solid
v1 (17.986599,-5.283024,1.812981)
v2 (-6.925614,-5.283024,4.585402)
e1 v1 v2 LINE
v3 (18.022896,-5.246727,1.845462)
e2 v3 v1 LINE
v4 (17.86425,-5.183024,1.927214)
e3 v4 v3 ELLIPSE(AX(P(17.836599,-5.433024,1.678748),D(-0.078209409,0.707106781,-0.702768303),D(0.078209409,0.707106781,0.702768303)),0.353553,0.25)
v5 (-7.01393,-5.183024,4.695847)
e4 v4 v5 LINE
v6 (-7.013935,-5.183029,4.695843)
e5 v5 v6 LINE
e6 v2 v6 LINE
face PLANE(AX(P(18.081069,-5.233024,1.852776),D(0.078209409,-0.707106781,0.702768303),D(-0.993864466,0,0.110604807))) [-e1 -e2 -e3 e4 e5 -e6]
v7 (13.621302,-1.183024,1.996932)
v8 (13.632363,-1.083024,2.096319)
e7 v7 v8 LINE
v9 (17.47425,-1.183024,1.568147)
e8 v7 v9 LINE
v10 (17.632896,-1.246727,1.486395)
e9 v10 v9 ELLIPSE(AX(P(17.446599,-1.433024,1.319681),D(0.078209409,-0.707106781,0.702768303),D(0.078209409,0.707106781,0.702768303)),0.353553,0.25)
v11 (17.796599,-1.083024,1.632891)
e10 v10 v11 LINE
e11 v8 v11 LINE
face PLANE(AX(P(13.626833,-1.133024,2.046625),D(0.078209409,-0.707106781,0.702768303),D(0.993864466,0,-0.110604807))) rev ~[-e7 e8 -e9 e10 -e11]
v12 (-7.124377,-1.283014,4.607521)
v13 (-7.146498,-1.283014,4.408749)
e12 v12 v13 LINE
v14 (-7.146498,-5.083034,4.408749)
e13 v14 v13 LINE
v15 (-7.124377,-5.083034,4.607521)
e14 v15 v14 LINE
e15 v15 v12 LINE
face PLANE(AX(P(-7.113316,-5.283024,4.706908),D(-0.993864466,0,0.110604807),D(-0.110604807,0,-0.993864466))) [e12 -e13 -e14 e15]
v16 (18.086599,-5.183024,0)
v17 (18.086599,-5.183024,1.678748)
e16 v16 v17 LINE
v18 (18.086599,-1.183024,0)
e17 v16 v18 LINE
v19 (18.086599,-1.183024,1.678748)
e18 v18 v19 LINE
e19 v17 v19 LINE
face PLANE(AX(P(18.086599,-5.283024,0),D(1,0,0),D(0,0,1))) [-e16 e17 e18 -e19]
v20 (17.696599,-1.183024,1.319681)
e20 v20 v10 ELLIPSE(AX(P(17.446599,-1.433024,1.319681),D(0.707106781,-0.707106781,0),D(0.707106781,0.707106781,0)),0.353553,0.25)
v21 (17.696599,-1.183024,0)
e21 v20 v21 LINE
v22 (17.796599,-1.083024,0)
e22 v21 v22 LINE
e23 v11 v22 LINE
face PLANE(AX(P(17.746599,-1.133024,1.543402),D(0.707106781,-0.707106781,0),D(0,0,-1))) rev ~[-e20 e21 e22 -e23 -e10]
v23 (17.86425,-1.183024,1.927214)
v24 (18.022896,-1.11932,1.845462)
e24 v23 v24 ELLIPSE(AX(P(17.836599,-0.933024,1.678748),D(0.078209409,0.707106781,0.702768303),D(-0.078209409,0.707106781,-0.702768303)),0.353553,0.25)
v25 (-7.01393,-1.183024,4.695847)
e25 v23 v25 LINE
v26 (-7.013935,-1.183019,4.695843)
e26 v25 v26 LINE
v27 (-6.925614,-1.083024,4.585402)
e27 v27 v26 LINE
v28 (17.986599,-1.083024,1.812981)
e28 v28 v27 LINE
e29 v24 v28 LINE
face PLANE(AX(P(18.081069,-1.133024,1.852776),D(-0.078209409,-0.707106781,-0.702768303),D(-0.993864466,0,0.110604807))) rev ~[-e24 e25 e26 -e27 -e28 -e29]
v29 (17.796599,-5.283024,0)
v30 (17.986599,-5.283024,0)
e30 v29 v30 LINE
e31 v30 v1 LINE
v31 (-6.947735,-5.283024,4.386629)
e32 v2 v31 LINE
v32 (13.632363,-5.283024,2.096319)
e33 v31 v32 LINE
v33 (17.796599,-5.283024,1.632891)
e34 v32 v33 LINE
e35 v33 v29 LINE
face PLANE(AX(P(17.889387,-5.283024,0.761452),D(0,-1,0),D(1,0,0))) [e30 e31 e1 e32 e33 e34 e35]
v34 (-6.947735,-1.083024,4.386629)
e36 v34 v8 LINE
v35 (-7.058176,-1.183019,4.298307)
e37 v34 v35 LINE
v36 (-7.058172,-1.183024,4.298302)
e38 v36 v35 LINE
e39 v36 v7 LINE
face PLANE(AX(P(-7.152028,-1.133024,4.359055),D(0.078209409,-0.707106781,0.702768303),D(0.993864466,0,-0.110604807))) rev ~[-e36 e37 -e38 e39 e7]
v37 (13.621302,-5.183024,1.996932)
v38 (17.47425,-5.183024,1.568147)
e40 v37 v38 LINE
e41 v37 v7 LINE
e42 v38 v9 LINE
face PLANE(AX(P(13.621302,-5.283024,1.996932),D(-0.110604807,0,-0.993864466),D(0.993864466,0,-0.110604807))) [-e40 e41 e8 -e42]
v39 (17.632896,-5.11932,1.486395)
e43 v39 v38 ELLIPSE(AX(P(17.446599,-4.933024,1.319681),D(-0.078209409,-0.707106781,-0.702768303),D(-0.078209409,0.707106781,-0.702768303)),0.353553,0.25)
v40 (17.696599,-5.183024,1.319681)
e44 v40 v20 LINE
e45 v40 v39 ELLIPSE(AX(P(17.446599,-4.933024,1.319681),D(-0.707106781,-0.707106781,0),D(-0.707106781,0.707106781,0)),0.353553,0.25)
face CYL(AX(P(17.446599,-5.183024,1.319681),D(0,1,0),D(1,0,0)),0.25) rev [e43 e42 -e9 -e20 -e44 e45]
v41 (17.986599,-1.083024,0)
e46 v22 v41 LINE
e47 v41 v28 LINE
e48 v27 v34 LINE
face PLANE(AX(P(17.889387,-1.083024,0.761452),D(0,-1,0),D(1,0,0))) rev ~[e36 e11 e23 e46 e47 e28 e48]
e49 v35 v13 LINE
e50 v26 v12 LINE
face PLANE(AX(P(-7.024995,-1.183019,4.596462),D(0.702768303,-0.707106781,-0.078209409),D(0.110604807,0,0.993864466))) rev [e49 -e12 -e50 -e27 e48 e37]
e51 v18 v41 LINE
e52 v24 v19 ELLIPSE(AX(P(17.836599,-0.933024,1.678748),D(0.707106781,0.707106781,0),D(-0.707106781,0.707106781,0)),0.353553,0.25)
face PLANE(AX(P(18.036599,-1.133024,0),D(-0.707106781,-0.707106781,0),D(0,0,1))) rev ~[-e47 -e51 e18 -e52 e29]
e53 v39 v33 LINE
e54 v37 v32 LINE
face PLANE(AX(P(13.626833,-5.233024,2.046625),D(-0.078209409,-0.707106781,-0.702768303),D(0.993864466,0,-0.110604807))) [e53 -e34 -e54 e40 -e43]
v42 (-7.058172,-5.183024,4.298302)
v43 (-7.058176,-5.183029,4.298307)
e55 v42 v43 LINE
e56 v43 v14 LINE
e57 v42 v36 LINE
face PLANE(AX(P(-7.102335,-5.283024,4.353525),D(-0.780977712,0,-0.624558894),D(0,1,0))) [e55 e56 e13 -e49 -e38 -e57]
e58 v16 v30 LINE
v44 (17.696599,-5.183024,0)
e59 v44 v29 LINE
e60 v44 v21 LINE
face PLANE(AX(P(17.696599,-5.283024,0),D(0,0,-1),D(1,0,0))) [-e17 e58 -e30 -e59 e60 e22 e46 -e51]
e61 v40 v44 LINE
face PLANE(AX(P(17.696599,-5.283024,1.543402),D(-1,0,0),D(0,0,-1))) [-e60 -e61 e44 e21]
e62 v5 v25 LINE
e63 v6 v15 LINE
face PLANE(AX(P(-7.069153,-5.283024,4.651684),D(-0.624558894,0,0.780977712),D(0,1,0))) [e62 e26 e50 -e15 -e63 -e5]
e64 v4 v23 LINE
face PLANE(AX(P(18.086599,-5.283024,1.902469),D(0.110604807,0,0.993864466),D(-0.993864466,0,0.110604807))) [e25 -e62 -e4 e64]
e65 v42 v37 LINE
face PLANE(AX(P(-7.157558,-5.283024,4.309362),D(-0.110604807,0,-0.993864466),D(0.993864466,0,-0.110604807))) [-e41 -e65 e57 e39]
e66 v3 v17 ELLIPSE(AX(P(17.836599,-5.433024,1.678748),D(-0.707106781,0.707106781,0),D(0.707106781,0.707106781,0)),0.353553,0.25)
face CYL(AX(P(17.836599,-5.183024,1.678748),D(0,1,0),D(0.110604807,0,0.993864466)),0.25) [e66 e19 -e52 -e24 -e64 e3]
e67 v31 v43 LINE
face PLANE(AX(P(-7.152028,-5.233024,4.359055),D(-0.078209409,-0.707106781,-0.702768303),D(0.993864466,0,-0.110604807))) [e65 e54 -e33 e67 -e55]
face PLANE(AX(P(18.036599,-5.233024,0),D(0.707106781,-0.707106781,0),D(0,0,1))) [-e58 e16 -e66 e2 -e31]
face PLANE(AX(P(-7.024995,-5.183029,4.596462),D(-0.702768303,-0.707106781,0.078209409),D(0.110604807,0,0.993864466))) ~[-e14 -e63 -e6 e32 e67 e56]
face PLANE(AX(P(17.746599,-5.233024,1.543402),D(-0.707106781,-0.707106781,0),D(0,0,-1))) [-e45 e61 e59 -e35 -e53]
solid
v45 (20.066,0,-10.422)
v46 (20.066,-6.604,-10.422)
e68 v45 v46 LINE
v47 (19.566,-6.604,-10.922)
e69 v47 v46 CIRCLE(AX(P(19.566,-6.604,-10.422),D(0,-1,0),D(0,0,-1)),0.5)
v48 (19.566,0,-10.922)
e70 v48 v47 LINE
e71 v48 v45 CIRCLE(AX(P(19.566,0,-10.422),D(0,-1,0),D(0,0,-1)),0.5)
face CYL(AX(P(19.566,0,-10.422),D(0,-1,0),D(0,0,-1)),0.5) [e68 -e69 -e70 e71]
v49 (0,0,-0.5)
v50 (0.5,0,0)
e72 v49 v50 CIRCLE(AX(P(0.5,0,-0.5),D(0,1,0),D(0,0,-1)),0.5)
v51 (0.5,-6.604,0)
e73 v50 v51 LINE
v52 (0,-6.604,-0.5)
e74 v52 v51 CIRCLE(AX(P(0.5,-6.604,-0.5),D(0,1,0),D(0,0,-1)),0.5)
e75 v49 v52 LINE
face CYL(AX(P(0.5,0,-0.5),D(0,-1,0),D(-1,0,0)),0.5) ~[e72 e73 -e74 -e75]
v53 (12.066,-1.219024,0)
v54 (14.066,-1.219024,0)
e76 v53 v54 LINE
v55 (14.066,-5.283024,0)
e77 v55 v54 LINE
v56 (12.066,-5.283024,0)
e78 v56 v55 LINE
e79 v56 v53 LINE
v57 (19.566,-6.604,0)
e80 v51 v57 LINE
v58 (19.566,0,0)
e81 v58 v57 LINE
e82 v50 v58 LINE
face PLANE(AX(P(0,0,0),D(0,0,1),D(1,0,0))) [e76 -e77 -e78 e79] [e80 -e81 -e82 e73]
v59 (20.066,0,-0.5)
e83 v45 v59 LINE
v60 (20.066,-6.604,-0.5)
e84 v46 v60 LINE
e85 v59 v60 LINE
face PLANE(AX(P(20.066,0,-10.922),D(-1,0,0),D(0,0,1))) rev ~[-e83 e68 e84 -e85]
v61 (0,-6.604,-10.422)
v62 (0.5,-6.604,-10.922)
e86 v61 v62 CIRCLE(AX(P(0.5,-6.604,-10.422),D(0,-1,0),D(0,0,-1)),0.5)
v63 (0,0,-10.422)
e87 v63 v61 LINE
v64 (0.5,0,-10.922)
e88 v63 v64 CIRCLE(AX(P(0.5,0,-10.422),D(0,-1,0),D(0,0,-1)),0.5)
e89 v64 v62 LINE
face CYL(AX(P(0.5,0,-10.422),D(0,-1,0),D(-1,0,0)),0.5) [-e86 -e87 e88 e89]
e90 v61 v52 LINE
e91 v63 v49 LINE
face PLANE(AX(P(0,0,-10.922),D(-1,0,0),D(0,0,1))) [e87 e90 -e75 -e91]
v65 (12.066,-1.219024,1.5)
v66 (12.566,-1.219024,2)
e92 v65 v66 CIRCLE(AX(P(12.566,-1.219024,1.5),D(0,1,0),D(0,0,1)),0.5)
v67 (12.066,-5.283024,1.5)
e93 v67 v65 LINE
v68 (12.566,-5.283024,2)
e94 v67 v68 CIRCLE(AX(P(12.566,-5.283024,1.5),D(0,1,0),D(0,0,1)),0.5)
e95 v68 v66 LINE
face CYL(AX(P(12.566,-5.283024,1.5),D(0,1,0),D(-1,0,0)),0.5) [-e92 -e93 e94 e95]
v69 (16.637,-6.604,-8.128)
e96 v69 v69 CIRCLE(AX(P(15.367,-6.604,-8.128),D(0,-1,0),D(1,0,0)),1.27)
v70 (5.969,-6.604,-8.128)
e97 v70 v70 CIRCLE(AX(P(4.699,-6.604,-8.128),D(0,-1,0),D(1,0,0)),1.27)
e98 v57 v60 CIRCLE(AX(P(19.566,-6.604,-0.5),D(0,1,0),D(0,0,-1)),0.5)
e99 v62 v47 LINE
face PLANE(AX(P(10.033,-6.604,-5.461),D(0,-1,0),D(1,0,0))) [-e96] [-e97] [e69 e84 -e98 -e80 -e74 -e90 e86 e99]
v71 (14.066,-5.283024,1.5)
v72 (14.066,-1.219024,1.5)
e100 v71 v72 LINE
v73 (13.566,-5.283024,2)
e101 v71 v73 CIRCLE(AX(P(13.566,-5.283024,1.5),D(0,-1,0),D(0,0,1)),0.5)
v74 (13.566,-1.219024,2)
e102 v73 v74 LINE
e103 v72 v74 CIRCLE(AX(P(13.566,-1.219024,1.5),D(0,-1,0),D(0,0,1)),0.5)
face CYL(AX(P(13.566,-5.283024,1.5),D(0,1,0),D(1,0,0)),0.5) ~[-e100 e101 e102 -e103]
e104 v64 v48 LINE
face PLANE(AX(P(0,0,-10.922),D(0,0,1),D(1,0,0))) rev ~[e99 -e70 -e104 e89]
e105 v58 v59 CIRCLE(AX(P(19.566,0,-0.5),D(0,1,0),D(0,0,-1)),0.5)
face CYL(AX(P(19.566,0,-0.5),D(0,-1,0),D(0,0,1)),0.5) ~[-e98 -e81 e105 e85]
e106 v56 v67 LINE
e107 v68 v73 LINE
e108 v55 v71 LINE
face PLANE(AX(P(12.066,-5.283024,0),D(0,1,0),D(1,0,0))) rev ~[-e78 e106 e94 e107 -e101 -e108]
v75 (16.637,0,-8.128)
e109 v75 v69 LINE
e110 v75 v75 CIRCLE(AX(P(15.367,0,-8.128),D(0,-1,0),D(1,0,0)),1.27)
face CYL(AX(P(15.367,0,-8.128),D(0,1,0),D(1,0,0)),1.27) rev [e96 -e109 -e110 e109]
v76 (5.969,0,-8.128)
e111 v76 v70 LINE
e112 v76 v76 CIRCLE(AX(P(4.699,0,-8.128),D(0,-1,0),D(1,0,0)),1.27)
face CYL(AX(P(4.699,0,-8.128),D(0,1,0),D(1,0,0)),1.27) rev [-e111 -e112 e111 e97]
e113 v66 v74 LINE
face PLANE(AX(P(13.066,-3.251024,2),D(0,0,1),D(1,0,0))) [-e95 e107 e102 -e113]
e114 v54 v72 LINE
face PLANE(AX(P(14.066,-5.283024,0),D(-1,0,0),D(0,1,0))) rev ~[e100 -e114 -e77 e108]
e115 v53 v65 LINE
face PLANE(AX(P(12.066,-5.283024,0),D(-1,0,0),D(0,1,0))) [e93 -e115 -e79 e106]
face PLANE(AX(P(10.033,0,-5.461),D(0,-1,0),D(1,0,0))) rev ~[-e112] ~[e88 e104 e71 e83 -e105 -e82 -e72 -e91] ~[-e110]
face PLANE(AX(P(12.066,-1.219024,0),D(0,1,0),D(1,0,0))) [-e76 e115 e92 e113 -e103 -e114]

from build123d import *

# Parameters (mm, degrees)
F0_W     = 20.066
F0_H     = 10.922
F0_R     = 1.27
F1_DEPTH = 6.604
F2_W     = 2
F2_H     = 4.064
F3_DEPTH = 2
F4_R     = 0.5
F7_DEPTH = 4.2
F8_SIZE  = 0.1
F9_SIZE  = 0.19999
F10_R    = 0.25


# Not quite as in the source:
# - a fillet or chamfer is up to 0.001 mm smaller than in the source, because OpenCascade refuses the exact size


with BuildPart() as f1:
    # F0 (on Front) → F1 (new body)
    with BuildSketch(Plane.XZ):
        with Locations((10.033, -5.461)):
            Rectangle(F0_W, F0_H)
        with Locations((4.699, -8.128)):
            Circle(F0_R, mode=Mode.SUBTRACT)
        with Locations((15.367, -8.128)):
            Circle(F0_R, mode=Mode.SUBTRACT)
    extrude(amount=F1_DEPTH)

    # F2 (on face) → F3 (join)
    with BuildSketch(Plane.XY):
        with Locations((13.066, -3.2510236964)):
            Rectangle(F2_W, F2_H)
    extrude(amount=F3_DEPTH)

    # F4
    f4_edges = [f1.edges().sort_by_distance(p)[0] for p in [
        (12.066, -3.251024, 2),
        (14.066, -3.251024, 2),
        (0, -3.302, 0),
        (20.066, -3.302, 0),
        (0, -3.302, -10.922),
        (20.066, -3.302, -10.922),
    ]]
    fillet(f4_edges, radius=F4_R)


with BuildPart() as f7:
    # F6 (on face) → F7 (new body)
    with BuildSketch(Plane.XZ.offset(5.2830236964)):
        Polygon((18.0865991861, 0), (18.0865991861, 1.5), (17.6965991861, 1.5434021702), (17.6965991861, 0), align=None)
        Polygon((17.6965991861, 1.5434021702), (18.0865991861, 1.5), (18.0865991861, 1.9024693645), (-7.1133163265, 4.7069078814), (-7.1575582493, 4.309362095), (13.6213023921, 1.9969322342), align=None)
    extrude(amount=-F7_DEPTH)

    # F8
    f8_edges = [f7.edges().sort_by_distance(p)[0] for p in [
        (18.086599, -5.283024, 0.951235),
        (5.486641, -5.283024, 3.304689),
        (5.26952, -5.283024, 2.926382),
        (17.696599, -5.283024, 0.771701),
        (18.086599, -1.083024, 0.951235),
        (5.486641, -1.083024, 3.304689),
        (17.696599, -1.083024, 0.771701),
        (5.26952, -1.083024, 2.926382),
        (-7.113316, -3.183024, 4.706908),
        (-7.157558, -3.183024, 4.309362),
    ]]
    chamfer(f8_edges, length=F8_SIZE)

    # F9 (size 0.2 in the source; OpenCascade refuses exactly that, so slightly less here)
    f9_edges = [f7.edges().sort_by_distance(p)[0] for p in [
        (-7.135437, -5.283024, 4.508135),
        (-7.135437, -1.083024, 4.508135),
    ]]
    chamfer(f9_edges, length=F9_SIZE)

    # F10
    f10_edges = [f7.edges().sort_by_distance(p)[0] for p in [
        (17.696599, -3.183024, 1.543402),
        (18.086599, -3.183024, 1.902469),
    ]]
    fillet(f10_edges, radius=F10_R)


solid = Compound([f1.part, f7.part])
